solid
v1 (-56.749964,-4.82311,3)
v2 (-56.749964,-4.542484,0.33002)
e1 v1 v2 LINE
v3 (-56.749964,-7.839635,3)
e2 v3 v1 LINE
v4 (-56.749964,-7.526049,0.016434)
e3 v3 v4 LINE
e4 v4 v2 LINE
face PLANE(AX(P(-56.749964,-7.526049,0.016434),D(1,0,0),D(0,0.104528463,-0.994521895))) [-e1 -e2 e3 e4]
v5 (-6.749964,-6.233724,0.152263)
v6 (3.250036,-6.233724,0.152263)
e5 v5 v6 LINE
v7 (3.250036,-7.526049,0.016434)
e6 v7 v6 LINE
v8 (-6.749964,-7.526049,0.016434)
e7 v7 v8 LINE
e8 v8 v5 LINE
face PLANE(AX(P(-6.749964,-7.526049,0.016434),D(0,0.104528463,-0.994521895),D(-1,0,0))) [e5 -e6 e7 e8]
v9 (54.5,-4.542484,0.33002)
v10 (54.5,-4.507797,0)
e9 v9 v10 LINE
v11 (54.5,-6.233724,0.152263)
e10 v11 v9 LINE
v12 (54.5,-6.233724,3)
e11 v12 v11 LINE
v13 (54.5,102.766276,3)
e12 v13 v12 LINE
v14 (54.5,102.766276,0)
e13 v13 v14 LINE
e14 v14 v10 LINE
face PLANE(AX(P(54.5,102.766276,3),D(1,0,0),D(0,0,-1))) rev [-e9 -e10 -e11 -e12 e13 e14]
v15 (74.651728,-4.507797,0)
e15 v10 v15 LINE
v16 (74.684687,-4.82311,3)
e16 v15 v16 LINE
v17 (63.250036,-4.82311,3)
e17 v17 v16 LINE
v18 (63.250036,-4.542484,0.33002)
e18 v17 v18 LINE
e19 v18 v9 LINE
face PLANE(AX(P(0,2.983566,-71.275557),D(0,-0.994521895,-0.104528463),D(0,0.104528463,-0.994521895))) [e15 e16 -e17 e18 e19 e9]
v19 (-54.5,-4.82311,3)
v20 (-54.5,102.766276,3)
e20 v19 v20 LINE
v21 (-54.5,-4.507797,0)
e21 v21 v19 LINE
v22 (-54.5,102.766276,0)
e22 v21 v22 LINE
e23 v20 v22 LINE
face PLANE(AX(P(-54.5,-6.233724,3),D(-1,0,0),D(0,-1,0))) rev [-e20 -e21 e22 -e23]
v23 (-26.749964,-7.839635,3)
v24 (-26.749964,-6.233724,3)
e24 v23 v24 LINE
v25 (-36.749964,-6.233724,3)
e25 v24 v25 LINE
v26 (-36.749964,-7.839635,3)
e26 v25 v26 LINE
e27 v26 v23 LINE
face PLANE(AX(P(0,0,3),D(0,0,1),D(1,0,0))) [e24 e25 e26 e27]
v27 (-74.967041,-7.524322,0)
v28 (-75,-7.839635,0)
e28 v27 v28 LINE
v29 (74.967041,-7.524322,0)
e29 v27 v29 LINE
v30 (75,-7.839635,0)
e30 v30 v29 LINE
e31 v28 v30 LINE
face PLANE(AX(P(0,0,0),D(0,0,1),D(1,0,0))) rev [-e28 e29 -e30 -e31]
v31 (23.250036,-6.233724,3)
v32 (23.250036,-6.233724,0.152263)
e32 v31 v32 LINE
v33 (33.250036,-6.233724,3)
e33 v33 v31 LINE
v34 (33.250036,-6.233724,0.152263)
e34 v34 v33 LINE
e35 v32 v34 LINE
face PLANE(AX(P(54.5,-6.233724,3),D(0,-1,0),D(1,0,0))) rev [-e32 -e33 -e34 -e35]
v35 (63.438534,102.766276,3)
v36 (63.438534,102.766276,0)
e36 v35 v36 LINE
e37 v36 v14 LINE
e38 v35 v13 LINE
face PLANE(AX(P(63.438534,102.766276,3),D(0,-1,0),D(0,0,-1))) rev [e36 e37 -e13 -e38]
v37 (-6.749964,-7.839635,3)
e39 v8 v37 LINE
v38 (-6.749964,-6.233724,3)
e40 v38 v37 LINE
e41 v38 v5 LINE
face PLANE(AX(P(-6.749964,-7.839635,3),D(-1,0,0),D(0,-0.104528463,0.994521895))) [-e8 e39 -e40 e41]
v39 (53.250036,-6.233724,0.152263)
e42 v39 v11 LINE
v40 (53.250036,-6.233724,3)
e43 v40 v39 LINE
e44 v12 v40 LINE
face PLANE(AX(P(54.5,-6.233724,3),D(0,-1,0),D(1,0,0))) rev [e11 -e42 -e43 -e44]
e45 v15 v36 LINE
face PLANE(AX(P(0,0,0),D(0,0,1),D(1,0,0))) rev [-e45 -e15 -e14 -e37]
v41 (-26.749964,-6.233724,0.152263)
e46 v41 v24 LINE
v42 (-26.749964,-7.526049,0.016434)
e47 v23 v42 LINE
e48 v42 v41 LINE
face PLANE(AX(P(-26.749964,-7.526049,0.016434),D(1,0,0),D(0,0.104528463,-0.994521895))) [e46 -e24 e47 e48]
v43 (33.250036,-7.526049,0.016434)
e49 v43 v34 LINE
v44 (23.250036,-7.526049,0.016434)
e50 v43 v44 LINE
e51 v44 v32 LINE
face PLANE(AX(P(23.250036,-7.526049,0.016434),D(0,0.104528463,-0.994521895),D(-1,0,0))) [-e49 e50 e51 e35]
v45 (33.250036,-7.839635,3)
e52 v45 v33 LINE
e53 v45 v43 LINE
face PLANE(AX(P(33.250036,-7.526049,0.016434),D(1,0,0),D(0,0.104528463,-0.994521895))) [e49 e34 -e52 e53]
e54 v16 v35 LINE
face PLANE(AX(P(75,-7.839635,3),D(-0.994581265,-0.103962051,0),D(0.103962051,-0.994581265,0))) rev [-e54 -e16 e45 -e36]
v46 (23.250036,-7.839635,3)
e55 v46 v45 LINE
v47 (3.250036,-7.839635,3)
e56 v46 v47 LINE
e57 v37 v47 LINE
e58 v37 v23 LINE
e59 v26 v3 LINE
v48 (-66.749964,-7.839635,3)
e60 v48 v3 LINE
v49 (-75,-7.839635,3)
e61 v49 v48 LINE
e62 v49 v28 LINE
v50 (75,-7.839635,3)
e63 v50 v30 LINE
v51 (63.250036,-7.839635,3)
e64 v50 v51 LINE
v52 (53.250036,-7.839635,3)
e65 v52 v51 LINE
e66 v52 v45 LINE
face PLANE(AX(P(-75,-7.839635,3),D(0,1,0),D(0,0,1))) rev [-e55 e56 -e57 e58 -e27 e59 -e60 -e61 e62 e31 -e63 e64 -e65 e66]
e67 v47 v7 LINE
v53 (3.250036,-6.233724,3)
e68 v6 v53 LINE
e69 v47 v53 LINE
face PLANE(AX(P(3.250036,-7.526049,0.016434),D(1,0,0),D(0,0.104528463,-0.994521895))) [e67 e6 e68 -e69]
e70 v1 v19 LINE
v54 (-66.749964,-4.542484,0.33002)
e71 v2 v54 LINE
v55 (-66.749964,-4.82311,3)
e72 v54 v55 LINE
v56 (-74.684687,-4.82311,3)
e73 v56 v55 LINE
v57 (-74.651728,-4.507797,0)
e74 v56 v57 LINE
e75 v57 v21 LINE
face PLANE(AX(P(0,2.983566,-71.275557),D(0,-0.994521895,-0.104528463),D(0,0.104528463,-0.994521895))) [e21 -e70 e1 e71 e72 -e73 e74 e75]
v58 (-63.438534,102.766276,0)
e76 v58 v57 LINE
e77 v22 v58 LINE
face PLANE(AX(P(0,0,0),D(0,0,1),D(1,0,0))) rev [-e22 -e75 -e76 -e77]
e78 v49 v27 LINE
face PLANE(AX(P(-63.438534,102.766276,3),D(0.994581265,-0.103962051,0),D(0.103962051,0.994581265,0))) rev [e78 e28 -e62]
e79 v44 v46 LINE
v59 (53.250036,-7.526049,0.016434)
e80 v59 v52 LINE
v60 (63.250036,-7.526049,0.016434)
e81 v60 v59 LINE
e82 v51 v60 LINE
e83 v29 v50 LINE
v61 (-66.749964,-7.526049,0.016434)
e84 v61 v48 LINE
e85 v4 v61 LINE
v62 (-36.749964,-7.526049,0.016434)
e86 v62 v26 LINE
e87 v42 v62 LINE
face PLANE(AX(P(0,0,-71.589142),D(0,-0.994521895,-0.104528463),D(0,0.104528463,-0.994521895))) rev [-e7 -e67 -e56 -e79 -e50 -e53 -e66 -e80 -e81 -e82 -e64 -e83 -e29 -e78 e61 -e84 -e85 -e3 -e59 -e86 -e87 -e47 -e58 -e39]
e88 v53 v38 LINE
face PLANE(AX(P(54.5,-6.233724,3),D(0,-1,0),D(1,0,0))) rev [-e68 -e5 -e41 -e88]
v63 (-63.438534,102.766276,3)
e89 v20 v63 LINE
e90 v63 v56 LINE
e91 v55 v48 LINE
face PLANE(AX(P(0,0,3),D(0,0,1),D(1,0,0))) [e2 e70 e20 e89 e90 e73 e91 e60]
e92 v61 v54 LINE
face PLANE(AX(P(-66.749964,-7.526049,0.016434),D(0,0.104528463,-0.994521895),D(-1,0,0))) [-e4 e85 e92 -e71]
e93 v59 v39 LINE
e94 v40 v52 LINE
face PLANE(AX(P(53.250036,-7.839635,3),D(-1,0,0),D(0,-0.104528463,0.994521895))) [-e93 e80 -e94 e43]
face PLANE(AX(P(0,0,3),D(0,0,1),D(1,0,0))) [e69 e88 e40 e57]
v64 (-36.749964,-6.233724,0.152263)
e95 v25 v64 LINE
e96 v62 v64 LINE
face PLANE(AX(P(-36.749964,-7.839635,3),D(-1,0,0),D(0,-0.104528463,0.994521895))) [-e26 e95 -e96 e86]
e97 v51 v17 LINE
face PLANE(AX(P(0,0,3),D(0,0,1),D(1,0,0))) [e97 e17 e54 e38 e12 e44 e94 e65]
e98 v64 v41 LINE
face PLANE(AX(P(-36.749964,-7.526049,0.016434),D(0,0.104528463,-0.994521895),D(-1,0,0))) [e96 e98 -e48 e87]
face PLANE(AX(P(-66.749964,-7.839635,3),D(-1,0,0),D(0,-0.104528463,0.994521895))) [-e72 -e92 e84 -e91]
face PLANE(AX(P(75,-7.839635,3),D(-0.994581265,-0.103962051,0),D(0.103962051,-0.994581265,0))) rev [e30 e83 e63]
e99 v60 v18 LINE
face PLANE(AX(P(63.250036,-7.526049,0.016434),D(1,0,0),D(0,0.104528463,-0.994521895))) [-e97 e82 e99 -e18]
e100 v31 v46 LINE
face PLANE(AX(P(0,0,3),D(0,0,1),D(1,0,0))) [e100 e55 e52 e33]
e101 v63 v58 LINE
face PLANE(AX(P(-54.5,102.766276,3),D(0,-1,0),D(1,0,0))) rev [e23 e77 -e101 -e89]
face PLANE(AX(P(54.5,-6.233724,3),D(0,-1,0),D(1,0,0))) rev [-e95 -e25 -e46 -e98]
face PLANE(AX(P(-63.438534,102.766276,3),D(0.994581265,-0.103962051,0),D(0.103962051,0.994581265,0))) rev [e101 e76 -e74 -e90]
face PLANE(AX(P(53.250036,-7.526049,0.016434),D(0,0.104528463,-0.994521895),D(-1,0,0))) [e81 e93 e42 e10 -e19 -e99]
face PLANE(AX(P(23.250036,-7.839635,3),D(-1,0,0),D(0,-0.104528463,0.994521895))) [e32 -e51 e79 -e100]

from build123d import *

# Parameters (mm, degrees)
BOSS_EXTRUDE1_DEPTH = 3
CAVITY1_START       = -3.803030659
CAVITY1_OUTLINE_W   = 20
CAVITY1_OUTLINE_H   = 3
CAVITY1_OUTLINE_W_2 = 12.749963879
CAVITY1_OUTLINE_W_3 = 9.250036121
CAVITY1_DEPTH       = 3.331837545
CAVITY1_START_2     = -0.803030659
CAVITY1_2_OUTLINE_W = 10
CAVITY1_2_OUTLINE_H = 3
CAVITY1_2_DEPTH     = 0.331837545


# Read off the part's stored shape, not the designer's step: Cavity1
with BuildPart() as part:
    # Sketch3 → Boss-Extrude1 (new body)
    with BuildSketch(Plane.XY):
        Polygon((-63.438534121, 102.766276007), (-75, -7.839634745), (75, -7.839634745), (63.438534121, 102.766276007), (54.5, 102.766276007), (54.5, -6.233723993), (-54.5, -6.233723993), (-54.5, 102.766276007), align=None)
    extrude(amount=BOSS_EXTRUDE1_DEPTH)

    # Cavity1 outline → Cavity1 (cut)
    with BuildSketch(Plane(origin=(0, 0, 0), x_dir=(1, 0, 0), z_dir=(0, 0.10452846326765304, -0.9945218953682734)).offset(CAVITY1_START)):
        with Locations((43.250036121, 5.983103016)):
            Rectangle(CAVITY1_OUTLINE_W, CAVITY1_OUTLINE_H)
        with Locations((13.250036121, 5.983103016)):
            Rectangle(CAVITY1_OUTLINE_W, CAVITY1_OUTLINE_H)
        with Locations((69.62501806, 5.983103016)):
            Rectangle(CAVITY1_OUTLINE_W_2, CAVITY1_OUTLINE_H)
        with Locations((-16.749963879, 5.983103016)):
            Rectangle(CAVITY1_OUTLINE_W, CAVITY1_OUTLINE_H)
        with Locations((-46.749963879, 5.983103016)):
            Rectangle(CAVITY1_OUTLINE_W, CAVITY1_OUTLINE_H)
        with Locations((-71.37498194, 5.983103016)):
            Rectangle(CAVITY1_OUTLINE_W_3, CAVITY1_OUTLINE_H)
    extrude(amount=CAVITY1_DEPTH, mode=Mode.SUBTRACT)

    # Cavity1 2 outline → Cavity1 2 (cut)
    with BuildSketch(Plane(origin=(0, 0, 0), x_dir=(1, 0, 0), z_dir=(0, 0.10452846326765304, -0.9945218953682734)).offset(CAVITY1_START_2)):
        with Locations((28.250036121, 5.983103016)):
            Rectangle(CAVITY1_2_OUTLINE_W, CAVITY1_2_OUTLINE_H)
        with Locations((58.250036121, 5.983103016)):
            Rectangle(CAVITY1_2_OUTLINE_W, CAVITY1_2_OUTLINE_H)
        with Locations((-1.749963879, 5.983103016)):
            Rectangle(CAVITY1_2_OUTLINE_W, CAVITY1_2_OUTLINE_H)
        with Locations((-31.749963879, 5.983103016)):
            Rectangle(CAVITY1_2_OUTLINE_W, CAVITY1_2_OUTLINE_H)
        with Locations((-61.749963879, 5.983103016)):
            Rectangle(CAVITY1_2_OUTLINE_W, CAVITY1_2_OUTLINE_H)
    extrude(amount=CAVITY1_2_DEPTH, mode=Mode.SUBTRACT)


solid = part.part
